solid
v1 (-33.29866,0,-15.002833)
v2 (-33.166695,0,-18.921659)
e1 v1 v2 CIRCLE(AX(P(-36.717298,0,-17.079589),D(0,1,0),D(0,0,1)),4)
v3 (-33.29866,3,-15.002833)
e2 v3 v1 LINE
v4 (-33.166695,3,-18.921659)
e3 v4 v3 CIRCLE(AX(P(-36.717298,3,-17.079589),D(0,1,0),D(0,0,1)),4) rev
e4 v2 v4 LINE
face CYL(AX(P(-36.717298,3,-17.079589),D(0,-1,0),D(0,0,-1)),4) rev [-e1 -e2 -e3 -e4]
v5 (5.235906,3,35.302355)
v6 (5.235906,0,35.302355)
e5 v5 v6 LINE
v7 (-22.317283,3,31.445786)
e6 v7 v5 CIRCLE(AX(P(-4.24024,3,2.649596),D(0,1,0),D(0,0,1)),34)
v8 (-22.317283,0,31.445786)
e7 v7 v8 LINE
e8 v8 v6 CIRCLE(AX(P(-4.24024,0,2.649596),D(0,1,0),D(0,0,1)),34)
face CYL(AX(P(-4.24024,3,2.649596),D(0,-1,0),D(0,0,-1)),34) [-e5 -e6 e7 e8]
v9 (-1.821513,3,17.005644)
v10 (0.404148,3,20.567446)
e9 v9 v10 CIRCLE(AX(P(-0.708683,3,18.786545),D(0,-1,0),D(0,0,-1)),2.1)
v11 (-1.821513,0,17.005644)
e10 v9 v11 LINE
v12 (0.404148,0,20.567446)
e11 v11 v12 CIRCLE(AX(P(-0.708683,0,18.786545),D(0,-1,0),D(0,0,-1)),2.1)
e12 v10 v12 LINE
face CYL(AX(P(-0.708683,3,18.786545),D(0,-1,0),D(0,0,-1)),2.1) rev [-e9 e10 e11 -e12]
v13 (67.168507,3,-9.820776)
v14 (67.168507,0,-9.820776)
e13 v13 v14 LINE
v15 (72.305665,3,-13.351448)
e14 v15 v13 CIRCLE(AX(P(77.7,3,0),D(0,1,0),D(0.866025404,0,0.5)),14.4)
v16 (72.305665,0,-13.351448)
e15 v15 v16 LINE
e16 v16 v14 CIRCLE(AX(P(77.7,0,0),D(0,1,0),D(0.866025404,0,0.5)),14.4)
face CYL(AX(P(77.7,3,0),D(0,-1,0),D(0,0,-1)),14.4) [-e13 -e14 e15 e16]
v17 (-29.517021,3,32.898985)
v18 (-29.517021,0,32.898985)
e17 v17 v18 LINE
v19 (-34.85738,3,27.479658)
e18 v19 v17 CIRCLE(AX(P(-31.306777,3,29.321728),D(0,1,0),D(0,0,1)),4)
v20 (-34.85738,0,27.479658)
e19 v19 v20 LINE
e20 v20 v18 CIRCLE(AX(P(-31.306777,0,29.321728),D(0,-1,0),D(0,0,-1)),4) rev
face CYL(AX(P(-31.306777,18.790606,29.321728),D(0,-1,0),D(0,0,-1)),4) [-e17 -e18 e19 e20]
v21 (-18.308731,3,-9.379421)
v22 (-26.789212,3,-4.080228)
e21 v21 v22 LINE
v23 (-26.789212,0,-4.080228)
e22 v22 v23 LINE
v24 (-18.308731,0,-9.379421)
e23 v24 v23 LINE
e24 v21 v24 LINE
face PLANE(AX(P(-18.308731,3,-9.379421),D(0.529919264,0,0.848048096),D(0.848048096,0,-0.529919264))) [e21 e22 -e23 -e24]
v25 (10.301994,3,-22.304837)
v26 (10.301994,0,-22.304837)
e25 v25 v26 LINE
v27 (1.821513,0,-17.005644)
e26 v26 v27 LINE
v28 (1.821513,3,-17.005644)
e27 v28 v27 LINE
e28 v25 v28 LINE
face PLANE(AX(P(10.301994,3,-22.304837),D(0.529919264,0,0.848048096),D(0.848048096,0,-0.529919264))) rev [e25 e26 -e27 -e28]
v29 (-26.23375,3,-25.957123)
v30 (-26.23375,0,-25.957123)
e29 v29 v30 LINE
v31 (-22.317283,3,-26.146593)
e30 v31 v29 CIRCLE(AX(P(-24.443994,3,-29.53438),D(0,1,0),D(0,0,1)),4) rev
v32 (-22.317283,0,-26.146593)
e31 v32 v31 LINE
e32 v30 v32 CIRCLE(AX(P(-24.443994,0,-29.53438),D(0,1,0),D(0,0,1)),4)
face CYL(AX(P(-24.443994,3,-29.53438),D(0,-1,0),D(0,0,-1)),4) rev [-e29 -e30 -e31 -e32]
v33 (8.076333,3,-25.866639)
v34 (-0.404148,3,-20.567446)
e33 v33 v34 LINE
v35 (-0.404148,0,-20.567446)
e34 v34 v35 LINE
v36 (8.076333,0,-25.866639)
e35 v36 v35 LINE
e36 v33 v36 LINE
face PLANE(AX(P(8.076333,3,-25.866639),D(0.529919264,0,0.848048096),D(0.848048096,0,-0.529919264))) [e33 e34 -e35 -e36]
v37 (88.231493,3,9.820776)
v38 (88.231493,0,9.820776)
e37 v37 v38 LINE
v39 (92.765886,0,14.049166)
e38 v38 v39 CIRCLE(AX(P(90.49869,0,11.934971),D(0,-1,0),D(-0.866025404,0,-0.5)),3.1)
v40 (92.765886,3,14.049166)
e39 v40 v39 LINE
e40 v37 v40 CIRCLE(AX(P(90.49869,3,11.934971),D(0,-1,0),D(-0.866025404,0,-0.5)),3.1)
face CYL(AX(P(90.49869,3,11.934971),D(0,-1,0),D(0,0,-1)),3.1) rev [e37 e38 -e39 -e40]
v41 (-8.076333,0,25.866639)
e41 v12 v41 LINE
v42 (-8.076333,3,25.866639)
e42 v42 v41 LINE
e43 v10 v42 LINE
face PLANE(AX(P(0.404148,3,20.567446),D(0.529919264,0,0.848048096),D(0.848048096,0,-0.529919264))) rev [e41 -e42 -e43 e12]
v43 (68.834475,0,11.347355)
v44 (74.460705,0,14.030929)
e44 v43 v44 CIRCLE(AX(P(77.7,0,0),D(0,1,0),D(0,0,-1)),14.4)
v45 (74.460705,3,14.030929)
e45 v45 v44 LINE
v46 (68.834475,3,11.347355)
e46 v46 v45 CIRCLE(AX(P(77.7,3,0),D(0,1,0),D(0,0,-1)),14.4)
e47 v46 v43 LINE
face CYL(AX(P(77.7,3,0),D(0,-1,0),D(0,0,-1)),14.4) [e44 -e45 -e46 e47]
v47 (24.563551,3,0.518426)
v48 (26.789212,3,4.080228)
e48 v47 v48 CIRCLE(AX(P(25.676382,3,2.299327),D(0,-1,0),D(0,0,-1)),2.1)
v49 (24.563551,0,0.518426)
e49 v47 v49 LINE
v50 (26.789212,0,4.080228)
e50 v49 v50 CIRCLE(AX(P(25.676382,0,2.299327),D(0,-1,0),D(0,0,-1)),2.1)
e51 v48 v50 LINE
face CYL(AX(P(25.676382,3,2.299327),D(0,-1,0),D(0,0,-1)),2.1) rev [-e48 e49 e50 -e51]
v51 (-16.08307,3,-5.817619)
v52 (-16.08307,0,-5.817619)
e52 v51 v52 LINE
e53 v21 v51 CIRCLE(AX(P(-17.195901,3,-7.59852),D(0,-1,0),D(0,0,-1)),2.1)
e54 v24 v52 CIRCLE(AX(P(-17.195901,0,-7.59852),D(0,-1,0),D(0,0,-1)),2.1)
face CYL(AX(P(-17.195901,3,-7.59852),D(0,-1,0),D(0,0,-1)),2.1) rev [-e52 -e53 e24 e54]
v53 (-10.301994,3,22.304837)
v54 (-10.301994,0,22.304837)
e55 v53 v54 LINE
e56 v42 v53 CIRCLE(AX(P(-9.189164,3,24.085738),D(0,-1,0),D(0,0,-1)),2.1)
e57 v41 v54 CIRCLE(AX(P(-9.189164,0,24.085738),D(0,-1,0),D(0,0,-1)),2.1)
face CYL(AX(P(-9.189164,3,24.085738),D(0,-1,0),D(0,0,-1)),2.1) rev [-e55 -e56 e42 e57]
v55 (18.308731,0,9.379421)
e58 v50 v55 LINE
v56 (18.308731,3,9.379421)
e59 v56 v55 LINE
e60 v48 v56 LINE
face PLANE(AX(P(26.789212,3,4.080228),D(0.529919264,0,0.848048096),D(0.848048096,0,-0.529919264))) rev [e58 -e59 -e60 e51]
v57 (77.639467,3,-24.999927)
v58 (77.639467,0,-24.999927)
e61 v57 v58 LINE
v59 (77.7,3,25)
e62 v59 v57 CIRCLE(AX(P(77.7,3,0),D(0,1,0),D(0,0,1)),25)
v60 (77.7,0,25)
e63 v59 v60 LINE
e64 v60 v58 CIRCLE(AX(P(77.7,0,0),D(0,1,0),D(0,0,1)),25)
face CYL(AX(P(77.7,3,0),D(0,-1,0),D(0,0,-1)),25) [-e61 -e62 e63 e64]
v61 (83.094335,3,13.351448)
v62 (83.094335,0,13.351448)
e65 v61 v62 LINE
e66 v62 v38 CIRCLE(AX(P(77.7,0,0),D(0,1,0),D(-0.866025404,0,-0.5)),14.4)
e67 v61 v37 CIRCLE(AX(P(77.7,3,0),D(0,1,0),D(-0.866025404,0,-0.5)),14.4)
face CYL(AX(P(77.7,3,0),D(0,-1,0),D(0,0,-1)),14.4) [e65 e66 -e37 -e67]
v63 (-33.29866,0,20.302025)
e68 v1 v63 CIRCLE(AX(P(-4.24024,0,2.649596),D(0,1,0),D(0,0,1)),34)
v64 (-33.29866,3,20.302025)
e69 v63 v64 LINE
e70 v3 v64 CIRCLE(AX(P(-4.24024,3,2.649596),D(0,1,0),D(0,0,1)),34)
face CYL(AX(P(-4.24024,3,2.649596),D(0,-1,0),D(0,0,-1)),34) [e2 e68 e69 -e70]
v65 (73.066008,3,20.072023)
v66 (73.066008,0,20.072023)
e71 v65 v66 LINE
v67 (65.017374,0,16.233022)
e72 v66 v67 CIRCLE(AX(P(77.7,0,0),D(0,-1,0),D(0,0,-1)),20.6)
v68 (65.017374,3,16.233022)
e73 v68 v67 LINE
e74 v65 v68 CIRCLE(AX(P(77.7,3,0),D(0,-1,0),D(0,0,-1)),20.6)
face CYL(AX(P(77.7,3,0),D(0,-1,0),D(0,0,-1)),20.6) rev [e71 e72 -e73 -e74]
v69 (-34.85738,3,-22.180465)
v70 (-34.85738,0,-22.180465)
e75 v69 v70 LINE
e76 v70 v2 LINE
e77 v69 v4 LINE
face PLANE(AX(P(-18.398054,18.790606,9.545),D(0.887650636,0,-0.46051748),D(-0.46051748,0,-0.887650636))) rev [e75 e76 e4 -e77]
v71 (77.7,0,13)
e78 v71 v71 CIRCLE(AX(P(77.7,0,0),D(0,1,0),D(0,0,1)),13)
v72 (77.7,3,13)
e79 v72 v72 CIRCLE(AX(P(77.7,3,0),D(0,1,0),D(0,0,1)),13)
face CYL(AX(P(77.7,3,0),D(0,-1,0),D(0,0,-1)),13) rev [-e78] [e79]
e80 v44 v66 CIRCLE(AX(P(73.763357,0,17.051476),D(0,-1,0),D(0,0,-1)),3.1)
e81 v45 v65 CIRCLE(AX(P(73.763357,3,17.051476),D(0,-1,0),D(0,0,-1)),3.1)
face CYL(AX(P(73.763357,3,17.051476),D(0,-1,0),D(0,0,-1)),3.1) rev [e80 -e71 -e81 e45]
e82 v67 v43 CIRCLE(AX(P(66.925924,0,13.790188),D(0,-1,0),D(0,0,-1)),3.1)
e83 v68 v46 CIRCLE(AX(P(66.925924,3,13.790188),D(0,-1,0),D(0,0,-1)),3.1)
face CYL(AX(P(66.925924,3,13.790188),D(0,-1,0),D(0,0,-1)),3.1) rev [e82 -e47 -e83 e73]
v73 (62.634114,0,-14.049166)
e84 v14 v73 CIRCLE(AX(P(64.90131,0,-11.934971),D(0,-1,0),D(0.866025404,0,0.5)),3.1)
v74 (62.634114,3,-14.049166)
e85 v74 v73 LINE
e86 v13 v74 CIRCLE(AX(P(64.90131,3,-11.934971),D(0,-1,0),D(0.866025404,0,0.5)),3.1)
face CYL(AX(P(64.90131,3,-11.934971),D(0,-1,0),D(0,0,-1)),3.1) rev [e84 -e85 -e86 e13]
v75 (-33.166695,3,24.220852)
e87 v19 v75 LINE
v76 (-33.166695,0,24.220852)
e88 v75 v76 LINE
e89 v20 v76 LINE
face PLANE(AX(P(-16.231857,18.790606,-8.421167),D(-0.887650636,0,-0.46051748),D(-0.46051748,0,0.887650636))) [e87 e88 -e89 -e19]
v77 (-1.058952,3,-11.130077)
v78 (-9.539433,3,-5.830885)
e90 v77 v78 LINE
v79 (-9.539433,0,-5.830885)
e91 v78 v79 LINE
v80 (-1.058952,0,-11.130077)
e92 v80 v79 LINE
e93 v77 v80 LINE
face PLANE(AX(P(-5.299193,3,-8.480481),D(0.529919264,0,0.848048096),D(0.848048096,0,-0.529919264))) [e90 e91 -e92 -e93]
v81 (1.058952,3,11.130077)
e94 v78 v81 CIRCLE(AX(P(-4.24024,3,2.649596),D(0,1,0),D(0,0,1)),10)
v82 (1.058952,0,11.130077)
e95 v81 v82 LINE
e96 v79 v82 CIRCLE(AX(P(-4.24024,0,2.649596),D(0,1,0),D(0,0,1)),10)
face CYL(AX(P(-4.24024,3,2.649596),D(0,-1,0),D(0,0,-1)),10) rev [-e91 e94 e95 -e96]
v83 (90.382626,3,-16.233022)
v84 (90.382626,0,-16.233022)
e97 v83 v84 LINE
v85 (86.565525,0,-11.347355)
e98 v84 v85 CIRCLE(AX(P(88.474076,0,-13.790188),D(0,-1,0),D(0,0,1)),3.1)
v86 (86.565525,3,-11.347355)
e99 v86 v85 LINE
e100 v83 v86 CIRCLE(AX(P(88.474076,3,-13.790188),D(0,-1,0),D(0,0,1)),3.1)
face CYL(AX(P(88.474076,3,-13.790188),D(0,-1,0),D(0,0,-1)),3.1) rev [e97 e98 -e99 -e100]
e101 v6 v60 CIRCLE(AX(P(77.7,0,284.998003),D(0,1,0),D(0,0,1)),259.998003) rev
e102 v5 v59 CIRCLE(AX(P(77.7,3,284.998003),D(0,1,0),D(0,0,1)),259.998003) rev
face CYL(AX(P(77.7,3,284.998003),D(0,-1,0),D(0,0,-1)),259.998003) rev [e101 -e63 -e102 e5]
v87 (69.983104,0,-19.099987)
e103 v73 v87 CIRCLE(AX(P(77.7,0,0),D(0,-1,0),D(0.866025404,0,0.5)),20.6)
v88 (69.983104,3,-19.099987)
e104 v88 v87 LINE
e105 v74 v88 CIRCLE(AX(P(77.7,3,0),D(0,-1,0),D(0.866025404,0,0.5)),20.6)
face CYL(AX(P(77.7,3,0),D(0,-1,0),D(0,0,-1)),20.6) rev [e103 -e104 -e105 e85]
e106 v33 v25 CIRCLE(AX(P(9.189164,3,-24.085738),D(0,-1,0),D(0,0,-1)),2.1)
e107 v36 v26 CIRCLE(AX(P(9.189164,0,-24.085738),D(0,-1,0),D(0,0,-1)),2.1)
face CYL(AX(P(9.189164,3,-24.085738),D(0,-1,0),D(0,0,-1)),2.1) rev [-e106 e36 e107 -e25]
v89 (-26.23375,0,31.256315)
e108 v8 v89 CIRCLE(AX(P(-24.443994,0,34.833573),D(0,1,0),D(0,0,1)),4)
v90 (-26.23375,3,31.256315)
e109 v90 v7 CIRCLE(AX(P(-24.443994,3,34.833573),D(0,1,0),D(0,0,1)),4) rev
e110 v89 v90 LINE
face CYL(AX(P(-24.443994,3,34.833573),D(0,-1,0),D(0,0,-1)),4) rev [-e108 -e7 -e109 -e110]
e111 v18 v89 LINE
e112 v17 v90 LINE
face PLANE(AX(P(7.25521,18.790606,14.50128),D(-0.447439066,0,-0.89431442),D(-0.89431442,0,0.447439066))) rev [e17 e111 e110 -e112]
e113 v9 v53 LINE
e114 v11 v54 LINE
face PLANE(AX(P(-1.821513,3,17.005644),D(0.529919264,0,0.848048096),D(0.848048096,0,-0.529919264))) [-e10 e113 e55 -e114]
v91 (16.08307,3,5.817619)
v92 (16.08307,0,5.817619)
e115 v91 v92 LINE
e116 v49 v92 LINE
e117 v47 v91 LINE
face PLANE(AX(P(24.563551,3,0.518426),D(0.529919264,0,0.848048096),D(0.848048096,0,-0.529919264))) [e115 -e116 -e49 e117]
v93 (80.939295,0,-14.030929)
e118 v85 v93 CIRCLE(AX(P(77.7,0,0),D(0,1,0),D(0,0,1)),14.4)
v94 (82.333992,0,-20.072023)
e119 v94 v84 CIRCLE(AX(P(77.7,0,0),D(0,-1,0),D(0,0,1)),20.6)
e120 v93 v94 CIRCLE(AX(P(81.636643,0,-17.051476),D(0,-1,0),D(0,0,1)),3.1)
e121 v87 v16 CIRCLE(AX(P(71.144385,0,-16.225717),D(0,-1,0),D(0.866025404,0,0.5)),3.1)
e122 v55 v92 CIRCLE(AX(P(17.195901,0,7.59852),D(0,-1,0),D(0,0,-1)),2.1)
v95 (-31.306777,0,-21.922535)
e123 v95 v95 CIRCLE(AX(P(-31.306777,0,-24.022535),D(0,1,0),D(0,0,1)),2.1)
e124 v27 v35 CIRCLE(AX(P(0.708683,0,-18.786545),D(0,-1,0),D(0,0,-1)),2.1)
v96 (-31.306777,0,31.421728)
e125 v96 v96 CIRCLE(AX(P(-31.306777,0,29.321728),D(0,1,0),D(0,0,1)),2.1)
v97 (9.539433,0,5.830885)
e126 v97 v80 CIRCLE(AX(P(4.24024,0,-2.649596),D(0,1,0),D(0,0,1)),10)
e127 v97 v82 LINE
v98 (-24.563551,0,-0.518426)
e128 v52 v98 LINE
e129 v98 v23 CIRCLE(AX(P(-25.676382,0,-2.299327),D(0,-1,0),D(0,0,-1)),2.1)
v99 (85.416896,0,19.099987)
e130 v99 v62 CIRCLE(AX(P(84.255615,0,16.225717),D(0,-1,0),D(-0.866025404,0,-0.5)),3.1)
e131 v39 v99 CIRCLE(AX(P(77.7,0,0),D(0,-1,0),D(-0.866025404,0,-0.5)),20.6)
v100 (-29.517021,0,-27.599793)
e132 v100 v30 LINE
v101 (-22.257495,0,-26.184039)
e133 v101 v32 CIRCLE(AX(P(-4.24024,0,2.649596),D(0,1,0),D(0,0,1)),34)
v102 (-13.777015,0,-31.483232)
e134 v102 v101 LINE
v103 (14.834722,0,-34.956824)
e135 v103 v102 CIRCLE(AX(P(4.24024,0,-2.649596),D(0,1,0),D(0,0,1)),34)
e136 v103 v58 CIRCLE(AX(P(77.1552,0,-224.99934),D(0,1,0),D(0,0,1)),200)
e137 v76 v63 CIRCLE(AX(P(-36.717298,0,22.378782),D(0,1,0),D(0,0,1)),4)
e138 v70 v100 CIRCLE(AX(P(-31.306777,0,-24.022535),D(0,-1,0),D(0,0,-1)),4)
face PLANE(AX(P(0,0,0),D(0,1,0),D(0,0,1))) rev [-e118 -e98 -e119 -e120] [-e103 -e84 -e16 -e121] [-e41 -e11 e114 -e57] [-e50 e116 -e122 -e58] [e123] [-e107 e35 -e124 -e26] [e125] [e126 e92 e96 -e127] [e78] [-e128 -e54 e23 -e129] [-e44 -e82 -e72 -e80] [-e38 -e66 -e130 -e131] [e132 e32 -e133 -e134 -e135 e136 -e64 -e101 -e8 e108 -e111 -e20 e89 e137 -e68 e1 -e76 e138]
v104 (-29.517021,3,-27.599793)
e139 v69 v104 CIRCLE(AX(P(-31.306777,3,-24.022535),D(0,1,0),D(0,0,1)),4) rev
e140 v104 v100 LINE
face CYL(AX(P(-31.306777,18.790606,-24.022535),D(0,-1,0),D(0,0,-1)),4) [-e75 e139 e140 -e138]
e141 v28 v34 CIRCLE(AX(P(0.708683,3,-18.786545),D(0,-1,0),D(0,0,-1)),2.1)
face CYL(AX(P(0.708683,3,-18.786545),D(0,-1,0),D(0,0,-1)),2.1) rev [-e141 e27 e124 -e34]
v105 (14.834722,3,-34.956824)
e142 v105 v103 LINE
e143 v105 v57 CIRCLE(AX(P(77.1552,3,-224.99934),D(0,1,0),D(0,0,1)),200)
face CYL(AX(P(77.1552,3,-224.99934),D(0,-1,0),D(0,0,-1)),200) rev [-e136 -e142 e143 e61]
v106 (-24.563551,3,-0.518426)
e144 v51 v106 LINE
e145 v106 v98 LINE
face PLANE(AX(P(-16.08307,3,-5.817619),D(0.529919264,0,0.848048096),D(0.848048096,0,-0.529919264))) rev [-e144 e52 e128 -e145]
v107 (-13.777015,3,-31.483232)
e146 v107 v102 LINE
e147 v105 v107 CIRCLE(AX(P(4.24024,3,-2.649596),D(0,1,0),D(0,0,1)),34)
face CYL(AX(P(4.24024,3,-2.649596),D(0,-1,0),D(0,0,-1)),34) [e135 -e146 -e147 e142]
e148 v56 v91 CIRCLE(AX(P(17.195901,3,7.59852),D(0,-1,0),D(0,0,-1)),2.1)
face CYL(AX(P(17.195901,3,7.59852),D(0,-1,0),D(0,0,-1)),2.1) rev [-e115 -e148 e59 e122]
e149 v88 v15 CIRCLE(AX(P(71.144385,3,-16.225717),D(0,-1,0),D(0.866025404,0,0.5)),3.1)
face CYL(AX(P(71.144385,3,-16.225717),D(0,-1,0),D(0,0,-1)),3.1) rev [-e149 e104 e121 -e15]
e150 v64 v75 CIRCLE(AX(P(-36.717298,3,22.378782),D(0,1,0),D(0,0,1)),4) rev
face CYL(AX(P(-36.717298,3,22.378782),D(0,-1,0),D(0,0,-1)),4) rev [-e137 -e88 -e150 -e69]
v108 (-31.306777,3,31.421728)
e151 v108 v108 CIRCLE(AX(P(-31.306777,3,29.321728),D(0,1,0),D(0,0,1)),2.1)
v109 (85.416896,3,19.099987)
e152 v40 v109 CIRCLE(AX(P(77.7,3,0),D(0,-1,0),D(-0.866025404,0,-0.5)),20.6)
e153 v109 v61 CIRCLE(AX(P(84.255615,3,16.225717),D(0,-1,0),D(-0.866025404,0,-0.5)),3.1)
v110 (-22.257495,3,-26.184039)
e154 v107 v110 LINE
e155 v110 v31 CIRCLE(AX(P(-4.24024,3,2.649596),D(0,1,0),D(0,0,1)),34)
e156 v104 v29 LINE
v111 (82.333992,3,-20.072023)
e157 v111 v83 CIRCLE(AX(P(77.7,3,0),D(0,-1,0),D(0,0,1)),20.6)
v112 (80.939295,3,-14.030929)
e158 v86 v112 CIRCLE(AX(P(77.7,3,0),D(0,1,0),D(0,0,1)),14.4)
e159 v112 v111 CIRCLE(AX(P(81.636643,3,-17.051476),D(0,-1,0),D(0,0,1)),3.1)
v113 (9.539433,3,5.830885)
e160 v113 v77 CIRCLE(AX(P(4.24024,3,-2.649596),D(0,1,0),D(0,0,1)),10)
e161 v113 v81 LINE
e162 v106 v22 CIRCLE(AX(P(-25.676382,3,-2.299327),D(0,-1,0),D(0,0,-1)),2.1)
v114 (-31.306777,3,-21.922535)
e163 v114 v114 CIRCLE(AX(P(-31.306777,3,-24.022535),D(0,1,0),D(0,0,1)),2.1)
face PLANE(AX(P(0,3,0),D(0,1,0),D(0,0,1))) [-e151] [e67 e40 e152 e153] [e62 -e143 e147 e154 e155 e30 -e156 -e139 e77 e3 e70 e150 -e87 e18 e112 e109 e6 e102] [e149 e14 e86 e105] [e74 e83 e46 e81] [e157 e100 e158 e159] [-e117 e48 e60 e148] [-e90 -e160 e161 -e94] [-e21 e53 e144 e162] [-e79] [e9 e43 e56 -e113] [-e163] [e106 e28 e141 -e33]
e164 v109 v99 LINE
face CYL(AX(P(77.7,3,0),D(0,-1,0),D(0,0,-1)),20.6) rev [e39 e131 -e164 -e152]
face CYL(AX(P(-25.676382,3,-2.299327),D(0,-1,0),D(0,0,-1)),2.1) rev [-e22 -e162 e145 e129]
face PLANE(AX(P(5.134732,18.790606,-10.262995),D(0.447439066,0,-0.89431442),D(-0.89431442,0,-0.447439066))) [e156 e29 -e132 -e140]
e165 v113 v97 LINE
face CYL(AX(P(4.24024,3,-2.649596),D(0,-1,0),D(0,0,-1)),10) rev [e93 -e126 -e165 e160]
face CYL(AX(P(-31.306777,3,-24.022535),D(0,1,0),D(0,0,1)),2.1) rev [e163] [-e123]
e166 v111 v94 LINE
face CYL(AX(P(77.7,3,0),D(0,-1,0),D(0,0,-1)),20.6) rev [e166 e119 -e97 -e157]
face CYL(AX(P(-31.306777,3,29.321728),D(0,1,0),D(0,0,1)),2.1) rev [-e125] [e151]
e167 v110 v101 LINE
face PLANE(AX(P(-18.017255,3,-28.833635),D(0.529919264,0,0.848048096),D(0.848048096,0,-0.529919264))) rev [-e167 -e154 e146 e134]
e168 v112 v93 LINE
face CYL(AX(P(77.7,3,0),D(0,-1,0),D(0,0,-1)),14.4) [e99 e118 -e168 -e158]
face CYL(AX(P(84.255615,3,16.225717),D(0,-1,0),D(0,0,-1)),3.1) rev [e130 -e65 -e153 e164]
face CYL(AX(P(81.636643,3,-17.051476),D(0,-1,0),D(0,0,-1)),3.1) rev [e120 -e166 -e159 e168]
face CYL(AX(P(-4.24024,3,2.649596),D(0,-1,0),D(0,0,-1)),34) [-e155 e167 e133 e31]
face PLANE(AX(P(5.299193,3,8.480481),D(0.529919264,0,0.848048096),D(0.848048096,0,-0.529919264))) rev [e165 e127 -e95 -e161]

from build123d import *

# Parameters (mm, degrees)
SKETCH_2_R               = 13
EXTRUDE_1_DEPTH          = 3
CUT_EXTRUDE_2_DEPTH      = 110.084751045
PATTERN_CURVE_1_DEPTH    = 3
CUT_EXTRUDE_4_DEPTH      = 110.084751045
PATTERN_CIRCULAR_1_COUNT = 6
EXTRUDE_2_DEPTH          = 3
HOLE_WIZARD_M4_1_D       = 4.2
FILLET_1_R               = 4


# Read off the part's stored shape, not the designer's step: 곡선 패턴1
with BuildPart() as part:
    # 스케치2 → 보스-돌출1 (new body)
    with BuildSketch(Plane(origin=(0, 0, 0), x_dir=(1, 0, 0), z_dir=(0, 1, 0))):
        with BuildLine():
            ThreePointArc((77.639466647, 24.999926714), (45.838842968, 27.466341176), (14.834721753, 34.956824097))
            ThreePointArc((14.834721753, 34.956824097), (0.14257607, 36.40176879), (-13.777014503, 31.48323159))
            Line((-13.777014503, 31.48323159), (-22.257495465, 26.184038948))
            ThreePointArc((-22.257495465, 26.184038948), (-35.278632699, -16.528292532), (5.235906124, -35.302354942))
            ThreePointArc((5.235906124, -35.302354942), (41.103608721, -27.588473828), (77.7, -25))
            ThreePointArc((77.7, -25), (102.699981679, 0.030266699), (77.639466647, 24.999926714))
        make_face()
        with BuildLine():
            Line((-9.539433123, 5.83088464), (-1.058952162, 11.130077283))
            ThreePointArc((-1.058952162, 11.130077283), (12.720721442, 7.948788963), (9.539433123, -5.83088464))
            Line((9.539433123, -5.83088464), (1.058952162, -11.130077283))
            ThreePointArc((1.058952162, -11.130077283), (-12.720721442, -7.948788963), (-9.539433123, 5.83088464))
        make_face(mode=Mode.SUBTRACT)
        with Locations(Location((77.7, 0, 0), (0, 0, 270))):
            Circle(SKETCH_2_R, mode=Mode.SUBTRACT)
    extrude(amount=EXTRUDE_1_DEPTH)

    # 스케치4 → 컷-돌출2 (cut, through all)
    with BuildSketch(Plane(origin=(0, 0, 0), x_dir=(-1, 0, 0), z_dir=(0, -1, 0))):
        with BuildLine():
            Line((1.82151317, -17.005644102), (10.301994131, -22.304836745))
            ThreePointArc((10.301994131, -22.304836745), (10.970064678, -25.198568201), (8.076333221, -25.866638748))
            Line((8.076333221, -25.866638748), (-0.40414774, -20.567446106))
            ThreePointArc((-0.40414774, -20.567446106), (-1.072218287, -17.673714649), (1.82151317, -17.005644102))
        make_face()
    extrude(amount=-CUT_EXTRUDE_2_DEPTH, mode=Mode.SUBTRACT)

    # 곡선 패턴1 outline → 곡선 패턴1 (cut)
    with BuildSketch(Plane(origin=(0, 0, 0), x_dir=(1, 0, 0), z_dir=(0, 1, 0))):
        with BuildLine():
            Line((24.563551451, -0.518425872), (16.08307049, -5.817618515))
            ThreePointArc((16.08307049, -5.817618515), (15.414999943, -8.711349971), (18.308731399, -9.379420519))
            Line((18.308731399, -9.379420519), (26.789212361, -4.080227876))
            ThreePointArc((26.789212361, -4.080227876), (27.457282908, -1.186496419), (24.563551451, -0.518425872))
        make_face()
        with BuildLine():
            ThreePointArc((-16.08307049, 5.817618515), (-15.414999943, 8.711349971), (-18.308731399, 9.379420519))
            Line((-18.308731399, 9.379420519), (-26.789212361, 4.080227876))
            ThreePointArc((-26.789212361, 4.080227876), (-27.457282908, 1.186496419), (-24.563551451, 0.518425872))
            Line((-24.563551451, 0.518425872), (-16.08307049, 5.817618515))
        make_face()
        with BuildLine():
            Line((8.076333221, 25.866638748), (-0.40414774, 20.567446106))
            ThreePointArc((-0.40414774, 20.567446106), (-1.072218287, 17.673714649), (1.82151317, 17.005644102))
            Line((1.82151317, 17.005644102), (10.301994131, 22.304836745))
            ThreePointArc((10.301994131, 22.304836745), (10.970064678, 25.198568202), (8.076333221, 25.866638748))
        make_face()
    extrude(amount=PATTERN_CURVE_1_DEPTH, mode=Mode.SUBTRACT)

    # 스케치5 → 컷-돌출4 (cut, through all)
    with BuildSketch(Plane(origin=(0, 0, 0), x_dir=(-1, 0, 0), z_dir=(0, -1, 0))):
        with BuildLine():
            ThreePointArc((-73.066008281, -20.072023335), (-68.831471406, -18.593256858), (-65.017373608, -16.233021524))
            ThreePointArc((-65.017373608, -16.233021524), (-64.483090846, -11.881637615), (-68.834474755, -11.347354852))
            ThreePointArc((-68.834474755, -11.347354852), (-71.500640206, -12.997228095), (-74.460704817, -14.030928933))
            ThreePointArc((-74.460704817, -14.030928933), (-76.78390375, -17.748824402), (-73.066008281, -20.072023335))
        make_face()
    cut_extrude_4 = extrude(amount=-CUT_EXTRUDE_4_DEPTH, mode=Mode.SUBTRACT)

    # 원형 패턴1: 컷-돌출4 ×6 about axis, 2 skipped
    pattern_circular_1_axis = Axis((77.7, 3, 0), (0, -1, 0))
    add([cut_extrude_4.rotate(pattern_circular_1_axis, i * 360 / PATTERN_CIRCULAR_1_COUNT) for i in range(1, PATTERN_CIRCULAR_1_COUNT) if i not in (1, 4)], mode=Mode.SUBTRACT)

    # 스케치7 → 보스-돌출2 (add)
    with BuildSketch(Plane.XZ):
        with BuildLine():
            ThreePointArc((-34.857379721, -22.180465117), (-34.155886305, -26.830127811), (-29.517020915, -27.599792717))
            Line((-29.517020915, -27.599792717), (-24.147285754, -24.913232788))
            ThreePointArc((-24.147285754, -24.913232788), (-28.457668053, -21.214942262), (-32.092293027, -16.850741341))
            Line((-32.092293027, -16.850741341), (-34.857379721, -22.180465117))
        make_face()
        with BuildLine():
            ThreePointArc((-29.517020915, 32.898985359), (-34.155886305, 32.129320453), (-34.857379721, 27.479657759))
            Line((-34.857379721, 27.479657759), (-32.092293027, 22.149933984))
            ThreePointArc((-32.092293027, 22.149933984), (-28.457668053, 26.514134904), (-24.147285754, 30.21242543))
            Line((-24.147285754, 30.21242543), (-29.517020915, 32.898985359))
        make_face()
    extrude(amount=-EXTRUDE_2_DEPTH)

    # M4 나선 코일용 탭 드릴1 (through all)
    with Locations(Plane(origin=(0, 3, 0), x_dir=(1, 0, 0), z_dir=(0, 1, 0))):
        with Locations((-31.306777179, 24.022535036), (-31.306777179, -29.321727679)):
            Hole(HOLE_WIZARD_M4_1_D / 2)

    # 필렛1
    fillet_1_edges = [part.edges().sort_by_distance(p)[0] for p in [
        (-24.147285754, 1.5, -24.913232788),
        (-32.092293027, 1.5, -16.850741341),
        (-32.092293027, 1.5, 22.149933984),
        (-24.147285754, 1.5, 30.21242543),
    ]]
    fillet(fillet_1_edges, radius=FILLET_1_R)


solid = part.part
